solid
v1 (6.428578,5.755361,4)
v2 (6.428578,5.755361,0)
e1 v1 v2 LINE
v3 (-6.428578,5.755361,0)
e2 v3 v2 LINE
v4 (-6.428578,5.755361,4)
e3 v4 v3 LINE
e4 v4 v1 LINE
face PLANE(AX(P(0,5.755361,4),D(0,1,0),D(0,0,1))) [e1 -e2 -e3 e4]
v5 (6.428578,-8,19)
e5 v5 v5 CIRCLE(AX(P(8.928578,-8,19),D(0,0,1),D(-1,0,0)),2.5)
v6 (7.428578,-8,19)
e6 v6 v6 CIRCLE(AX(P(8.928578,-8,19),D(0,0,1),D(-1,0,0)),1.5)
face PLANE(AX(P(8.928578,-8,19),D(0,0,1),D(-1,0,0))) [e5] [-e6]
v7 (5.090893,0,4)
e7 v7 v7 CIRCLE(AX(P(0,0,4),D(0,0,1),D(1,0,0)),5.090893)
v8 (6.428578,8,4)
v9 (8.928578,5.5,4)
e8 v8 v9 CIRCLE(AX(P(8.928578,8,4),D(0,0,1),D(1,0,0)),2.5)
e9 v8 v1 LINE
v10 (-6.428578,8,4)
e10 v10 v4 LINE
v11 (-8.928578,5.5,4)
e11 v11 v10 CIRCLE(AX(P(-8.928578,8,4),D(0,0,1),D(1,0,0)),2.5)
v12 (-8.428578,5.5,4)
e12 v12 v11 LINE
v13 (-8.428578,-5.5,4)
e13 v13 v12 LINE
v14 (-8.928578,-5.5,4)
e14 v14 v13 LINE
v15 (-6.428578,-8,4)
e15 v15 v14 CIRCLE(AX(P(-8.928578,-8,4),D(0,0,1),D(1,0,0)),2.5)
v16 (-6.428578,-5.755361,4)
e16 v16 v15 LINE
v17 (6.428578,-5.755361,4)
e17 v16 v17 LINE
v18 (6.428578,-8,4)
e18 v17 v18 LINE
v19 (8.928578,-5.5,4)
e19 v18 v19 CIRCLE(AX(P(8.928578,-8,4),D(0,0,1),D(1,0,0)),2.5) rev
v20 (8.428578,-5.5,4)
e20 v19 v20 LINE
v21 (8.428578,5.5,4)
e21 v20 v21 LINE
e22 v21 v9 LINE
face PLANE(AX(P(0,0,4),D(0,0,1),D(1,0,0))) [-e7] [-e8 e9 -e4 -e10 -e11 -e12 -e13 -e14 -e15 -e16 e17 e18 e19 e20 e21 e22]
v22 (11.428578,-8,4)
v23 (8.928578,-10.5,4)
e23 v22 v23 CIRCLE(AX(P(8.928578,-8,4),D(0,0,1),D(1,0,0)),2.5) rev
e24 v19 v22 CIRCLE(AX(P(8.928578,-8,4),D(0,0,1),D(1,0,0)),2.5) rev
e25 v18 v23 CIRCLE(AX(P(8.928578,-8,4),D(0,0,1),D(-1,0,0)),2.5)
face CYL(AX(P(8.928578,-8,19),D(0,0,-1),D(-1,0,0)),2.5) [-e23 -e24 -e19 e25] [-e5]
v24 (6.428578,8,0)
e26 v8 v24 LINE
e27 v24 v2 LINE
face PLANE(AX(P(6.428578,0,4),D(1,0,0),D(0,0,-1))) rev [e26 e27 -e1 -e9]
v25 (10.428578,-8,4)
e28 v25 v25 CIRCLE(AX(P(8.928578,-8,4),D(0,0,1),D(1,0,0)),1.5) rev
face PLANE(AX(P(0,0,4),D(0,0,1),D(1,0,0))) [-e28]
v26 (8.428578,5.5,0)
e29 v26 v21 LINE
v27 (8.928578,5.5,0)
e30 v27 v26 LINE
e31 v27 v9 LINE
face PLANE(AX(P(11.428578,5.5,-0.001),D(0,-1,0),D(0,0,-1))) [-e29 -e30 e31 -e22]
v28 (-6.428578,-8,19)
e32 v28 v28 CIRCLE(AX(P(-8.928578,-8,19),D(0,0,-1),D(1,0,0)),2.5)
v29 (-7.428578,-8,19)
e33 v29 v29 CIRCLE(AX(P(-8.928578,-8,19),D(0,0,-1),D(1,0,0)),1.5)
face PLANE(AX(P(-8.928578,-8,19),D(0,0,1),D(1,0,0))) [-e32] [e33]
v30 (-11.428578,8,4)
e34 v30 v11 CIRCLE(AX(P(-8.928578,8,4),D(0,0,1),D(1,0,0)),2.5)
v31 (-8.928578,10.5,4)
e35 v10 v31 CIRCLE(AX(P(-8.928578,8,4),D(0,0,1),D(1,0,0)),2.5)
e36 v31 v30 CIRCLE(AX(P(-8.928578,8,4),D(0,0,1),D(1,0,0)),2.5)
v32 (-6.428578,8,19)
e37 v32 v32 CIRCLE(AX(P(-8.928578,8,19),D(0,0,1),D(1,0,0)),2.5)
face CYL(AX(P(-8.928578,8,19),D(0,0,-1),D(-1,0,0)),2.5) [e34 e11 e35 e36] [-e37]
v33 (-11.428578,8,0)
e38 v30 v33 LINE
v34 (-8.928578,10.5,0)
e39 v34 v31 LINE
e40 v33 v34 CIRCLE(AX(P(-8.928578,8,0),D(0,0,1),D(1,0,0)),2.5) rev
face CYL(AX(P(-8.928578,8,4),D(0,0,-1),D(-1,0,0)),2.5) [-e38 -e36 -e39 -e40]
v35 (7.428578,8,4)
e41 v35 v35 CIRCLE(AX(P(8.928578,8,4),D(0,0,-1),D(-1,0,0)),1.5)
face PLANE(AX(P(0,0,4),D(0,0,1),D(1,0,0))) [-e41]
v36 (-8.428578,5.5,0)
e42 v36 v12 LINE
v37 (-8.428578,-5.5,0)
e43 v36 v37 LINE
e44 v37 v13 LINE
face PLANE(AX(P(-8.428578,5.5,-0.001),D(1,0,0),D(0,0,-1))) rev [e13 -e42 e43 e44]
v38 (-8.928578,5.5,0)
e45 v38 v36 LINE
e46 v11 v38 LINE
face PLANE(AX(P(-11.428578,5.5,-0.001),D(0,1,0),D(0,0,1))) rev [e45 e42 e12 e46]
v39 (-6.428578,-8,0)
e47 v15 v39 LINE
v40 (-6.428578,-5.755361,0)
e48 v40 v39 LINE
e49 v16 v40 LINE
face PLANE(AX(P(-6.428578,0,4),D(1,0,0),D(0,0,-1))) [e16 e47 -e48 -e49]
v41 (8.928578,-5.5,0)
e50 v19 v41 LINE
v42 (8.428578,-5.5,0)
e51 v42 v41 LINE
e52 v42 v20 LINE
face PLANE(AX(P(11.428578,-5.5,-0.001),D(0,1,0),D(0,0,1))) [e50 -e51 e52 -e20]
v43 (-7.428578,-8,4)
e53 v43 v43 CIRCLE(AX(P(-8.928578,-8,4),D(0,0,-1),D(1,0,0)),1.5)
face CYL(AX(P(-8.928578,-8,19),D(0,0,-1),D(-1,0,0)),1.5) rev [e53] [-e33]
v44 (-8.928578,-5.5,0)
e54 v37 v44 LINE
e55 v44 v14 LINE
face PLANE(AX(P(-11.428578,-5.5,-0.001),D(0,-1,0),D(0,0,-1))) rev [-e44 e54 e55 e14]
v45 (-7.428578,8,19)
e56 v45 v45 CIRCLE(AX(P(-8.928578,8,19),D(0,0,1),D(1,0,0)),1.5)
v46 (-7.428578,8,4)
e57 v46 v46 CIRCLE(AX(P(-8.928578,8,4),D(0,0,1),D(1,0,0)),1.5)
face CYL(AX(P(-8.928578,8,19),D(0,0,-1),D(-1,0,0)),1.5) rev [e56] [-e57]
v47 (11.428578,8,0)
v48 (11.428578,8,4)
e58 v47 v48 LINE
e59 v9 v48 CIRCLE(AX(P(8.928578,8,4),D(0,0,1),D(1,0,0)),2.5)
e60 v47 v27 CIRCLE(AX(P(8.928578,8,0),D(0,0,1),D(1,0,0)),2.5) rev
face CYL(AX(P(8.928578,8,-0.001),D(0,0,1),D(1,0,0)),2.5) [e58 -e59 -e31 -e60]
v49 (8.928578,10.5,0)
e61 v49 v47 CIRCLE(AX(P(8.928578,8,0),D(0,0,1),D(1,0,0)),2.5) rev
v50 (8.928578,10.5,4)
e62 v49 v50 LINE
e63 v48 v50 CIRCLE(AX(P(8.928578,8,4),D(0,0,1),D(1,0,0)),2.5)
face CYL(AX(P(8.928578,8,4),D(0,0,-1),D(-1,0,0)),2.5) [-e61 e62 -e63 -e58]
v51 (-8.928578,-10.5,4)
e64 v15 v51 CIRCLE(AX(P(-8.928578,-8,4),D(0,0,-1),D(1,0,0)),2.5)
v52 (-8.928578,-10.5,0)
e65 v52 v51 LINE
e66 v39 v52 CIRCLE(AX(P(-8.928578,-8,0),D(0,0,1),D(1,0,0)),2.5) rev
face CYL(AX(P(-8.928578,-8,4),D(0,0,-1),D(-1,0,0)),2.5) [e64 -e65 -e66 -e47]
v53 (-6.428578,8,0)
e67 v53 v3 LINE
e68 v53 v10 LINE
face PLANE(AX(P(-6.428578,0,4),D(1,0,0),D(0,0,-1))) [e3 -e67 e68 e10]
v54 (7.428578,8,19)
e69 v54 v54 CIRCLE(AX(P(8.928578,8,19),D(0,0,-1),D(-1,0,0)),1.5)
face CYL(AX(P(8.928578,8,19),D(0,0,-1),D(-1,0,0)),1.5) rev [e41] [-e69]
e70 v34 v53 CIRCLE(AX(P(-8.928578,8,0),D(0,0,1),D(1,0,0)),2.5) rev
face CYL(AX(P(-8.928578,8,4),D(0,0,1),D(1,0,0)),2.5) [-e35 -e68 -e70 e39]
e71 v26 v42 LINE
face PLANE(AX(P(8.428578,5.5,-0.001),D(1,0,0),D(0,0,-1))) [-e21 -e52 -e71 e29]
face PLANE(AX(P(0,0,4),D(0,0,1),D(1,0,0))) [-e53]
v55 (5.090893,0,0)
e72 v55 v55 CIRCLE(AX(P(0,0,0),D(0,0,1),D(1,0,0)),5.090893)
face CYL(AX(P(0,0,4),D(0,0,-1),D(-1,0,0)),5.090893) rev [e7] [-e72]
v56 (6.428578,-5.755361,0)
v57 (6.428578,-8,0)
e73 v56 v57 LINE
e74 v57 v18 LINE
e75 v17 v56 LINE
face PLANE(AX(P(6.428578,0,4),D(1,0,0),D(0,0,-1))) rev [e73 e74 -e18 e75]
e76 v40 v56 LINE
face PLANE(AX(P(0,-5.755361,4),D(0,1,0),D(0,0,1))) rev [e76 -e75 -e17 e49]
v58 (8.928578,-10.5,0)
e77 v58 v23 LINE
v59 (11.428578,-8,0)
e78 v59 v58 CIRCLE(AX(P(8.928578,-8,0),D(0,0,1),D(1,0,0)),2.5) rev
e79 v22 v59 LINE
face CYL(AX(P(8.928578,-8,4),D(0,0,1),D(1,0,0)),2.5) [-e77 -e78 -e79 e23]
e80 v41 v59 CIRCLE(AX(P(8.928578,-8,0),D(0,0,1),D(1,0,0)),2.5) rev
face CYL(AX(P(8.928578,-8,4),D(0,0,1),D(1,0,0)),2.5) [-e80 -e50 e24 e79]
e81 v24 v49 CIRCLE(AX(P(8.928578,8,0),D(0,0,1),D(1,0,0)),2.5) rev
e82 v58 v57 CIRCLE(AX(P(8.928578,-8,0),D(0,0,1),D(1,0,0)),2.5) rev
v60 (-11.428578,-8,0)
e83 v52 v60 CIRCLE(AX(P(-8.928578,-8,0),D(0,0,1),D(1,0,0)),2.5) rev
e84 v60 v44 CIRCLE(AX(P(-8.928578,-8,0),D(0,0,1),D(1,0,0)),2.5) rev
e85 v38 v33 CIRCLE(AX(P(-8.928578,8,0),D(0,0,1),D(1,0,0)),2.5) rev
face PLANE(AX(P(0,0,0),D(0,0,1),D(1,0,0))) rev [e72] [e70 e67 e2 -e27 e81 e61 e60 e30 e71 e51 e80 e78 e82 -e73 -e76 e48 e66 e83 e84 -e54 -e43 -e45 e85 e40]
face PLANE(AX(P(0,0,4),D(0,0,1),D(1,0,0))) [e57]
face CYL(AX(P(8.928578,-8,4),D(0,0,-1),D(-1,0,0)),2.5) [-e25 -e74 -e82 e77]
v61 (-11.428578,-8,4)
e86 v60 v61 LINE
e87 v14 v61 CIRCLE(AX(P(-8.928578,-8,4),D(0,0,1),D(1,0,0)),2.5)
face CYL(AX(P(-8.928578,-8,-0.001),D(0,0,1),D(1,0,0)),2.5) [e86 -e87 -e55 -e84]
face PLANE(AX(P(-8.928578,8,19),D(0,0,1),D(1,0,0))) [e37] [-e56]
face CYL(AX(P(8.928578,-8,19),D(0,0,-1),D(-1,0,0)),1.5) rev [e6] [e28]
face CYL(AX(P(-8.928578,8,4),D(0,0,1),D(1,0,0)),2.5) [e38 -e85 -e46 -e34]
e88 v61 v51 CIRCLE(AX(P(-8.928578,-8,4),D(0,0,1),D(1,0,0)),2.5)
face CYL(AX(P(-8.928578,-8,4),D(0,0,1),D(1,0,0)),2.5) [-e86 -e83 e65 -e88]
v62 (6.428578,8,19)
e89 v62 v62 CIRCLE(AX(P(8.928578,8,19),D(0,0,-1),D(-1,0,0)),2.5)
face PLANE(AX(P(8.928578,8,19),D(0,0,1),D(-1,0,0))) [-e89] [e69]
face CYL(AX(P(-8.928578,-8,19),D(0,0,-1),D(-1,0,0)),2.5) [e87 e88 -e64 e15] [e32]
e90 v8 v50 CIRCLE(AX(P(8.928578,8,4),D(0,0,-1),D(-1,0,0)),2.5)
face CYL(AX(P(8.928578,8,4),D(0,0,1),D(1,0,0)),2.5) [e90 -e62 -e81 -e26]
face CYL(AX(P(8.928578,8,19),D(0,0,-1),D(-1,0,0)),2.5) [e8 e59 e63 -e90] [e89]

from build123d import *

# Parameters (mm, degrees)
SKETCH1_W                 = 5
SKETCH1_H                 = 21
SKETCH1_W_2               = 12.857156358
SKETCH1_H_2               = 11.510722094
SKETCH1_R                 = 5.090892781
BOSS_EXTRUDE3_DEPTH       = 4
SKETCH2_R                 = 2.5
SKETCH2_R_2               = 1.5
BOSS_EXTRUDE4_DEPTH       = 15
MIRROR2_COPY_1_SKETCH_R   = 2.5
MIRROR2_COPY_1_SKETCH_R_2 = 1.5
MIRROR2_COPY_1_DEPTH      = 15
FILLET1_R                 = 2.5
CUT_EXTRUDE1_REACH        = 23.584
SKETCH3_W                 = 3
SKETCH3_H                 = 11
FILLET2_R                 = 2.5
FILLET3_R                 = 2.5


with BuildPart() as part:
    # Sketch1 → Boss-Extrude3 (new body)
    # profile 1 of 3: a face of its own
    with BuildSketch(Plane.XY):
        with Locations((8.928578179, 0)):
            Rectangle(SKETCH1_W, SKETCH1_H)
    # profile 2 of 3: a face of its own
    with BuildSketch(Plane.XY):
        Rectangle(SKETCH1_W_2, SKETCH1_H_2)
        Circle(SKETCH1_R, mode=Mode.SUBTRACT)
    # profile 3 of 3: a face of its own
    with BuildSketch(Plane.XY):
        with Locations((-8.928578179, 0)):
            Rectangle(SKETCH1_W, SKETCH1_H)
    extrude(amount=BOSS_EXTRUDE3_DEPTH)

    # Sketch2 → Boss-Extrude4 (add)
    with BuildSketch(Plane.XY.offset(4)):
        with Locations((-8.928578179, 8)):
            Circle(SKETCH2_R)
        with Locations((-8.928578179, 8)):
            Circle(SKETCH2_R_2, mode=Mode.SUBTRACT)
    boss_extrude4 = extrude(amount=BOSS_EXTRUDE4_DEPTH)

    # Mirror1: Boss-Extrude4 across plane
    add(boss_extrude4.mirror(Plane(origin=(0, 0, 0), x_dir=(0, 0, 1), z_dir=(1, 0, 0))))

    # Mirror2: Boss-Extrude4 across plane
    add(boss_extrude4.mirror(Plane.ZX))

    # Mirror2 copy 1 sketch → Mirror2 copy 1 (add)
    with BuildSketch(Plane(origin=(0, 0, 4), x_dir=(-1, 0, 0), z_dir=(0, 0, 1))):
        with Locations((-8.928578179, 8)):
            Circle(MIRROR2_COPY_1_SKETCH_R)
        with Locations((-8.928578179, 8)):
            Circle(MIRROR2_COPY_1_SKETCH_R_2, mode=Mode.SUBTRACT)
    extrude(amount=MIRROR2_COPY_1_DEPTH)

    # Fillet1
    fillet1_edges = [part.edges().sort_by_distance(p)[0] for p in [
        (-11.428578179, 10.5, 2),
        (-11.428578179, -10.5, 2),
        (-6.428578179, -10.5, 2),
        (6.428578179, -10.5, 2),
        (11.428578179, -10.5, 2),
        (11.428578179, 10.5, 2),
        (6.428578179, 10.5, 2),
        (-6.428578179, 10.5, 2),
    ]]
    fillet(fillet1_edges, radius=FILLET1_R - 0.0001)  # a hair under: the kernel refuses the full size

    # Sketch3 → Cut-Extrude1 (cut, up to next)
    with BuildSketch(Plane.XY.offset(4), mode=Mode.PRIVATE) as cut_extrude1_sk1:
        with Locations((-9.928578179, 0)):
            Rectangle(SKETCH3_W, SKETCH3_H)
    cut_extrude1_tool1 = extrude(cut_extrude1_sk1.sketch, amount=-CUT_EXTRUDE1_REACH, mode=Mode.PRIVATE) & part.part
    cut_extrude1 = cut_extrude1_tool1.solids().sort_by_distance((-9.928578, 0, 4))[0]
    add(cut_extrude1, mode=Mode.SUBTRACT)

    # Fillet2
    fillet2_edges = [part.edges().sort_by_distance(p)[0] for p in [
        (-11.428578179, 5.5, 2),
    ]]
    fillet(fillet2_edges, radius=FILLET2_R)

    # Mirror3: Cut-Extrude1 across plane
    add(cut_extrude1.mirror(Plane(origin=(0, 0, 0), x_dir=(0, 0, 1), z_dir=(1, 0, 0))), mode=Mode.SUBTRACT)

    # Fillet3
    fillet3_edges = [part.edges().sort_by_distance(p)[0] for p in [
        (-11.428578179, -5.5, 2),
        (11.428578179, -5.5, 2),
        (11.428578179, 5.5, 2),
    ]]
    fillet(fillet3_edges, radius=FILLET3_R)


solid = part.part
